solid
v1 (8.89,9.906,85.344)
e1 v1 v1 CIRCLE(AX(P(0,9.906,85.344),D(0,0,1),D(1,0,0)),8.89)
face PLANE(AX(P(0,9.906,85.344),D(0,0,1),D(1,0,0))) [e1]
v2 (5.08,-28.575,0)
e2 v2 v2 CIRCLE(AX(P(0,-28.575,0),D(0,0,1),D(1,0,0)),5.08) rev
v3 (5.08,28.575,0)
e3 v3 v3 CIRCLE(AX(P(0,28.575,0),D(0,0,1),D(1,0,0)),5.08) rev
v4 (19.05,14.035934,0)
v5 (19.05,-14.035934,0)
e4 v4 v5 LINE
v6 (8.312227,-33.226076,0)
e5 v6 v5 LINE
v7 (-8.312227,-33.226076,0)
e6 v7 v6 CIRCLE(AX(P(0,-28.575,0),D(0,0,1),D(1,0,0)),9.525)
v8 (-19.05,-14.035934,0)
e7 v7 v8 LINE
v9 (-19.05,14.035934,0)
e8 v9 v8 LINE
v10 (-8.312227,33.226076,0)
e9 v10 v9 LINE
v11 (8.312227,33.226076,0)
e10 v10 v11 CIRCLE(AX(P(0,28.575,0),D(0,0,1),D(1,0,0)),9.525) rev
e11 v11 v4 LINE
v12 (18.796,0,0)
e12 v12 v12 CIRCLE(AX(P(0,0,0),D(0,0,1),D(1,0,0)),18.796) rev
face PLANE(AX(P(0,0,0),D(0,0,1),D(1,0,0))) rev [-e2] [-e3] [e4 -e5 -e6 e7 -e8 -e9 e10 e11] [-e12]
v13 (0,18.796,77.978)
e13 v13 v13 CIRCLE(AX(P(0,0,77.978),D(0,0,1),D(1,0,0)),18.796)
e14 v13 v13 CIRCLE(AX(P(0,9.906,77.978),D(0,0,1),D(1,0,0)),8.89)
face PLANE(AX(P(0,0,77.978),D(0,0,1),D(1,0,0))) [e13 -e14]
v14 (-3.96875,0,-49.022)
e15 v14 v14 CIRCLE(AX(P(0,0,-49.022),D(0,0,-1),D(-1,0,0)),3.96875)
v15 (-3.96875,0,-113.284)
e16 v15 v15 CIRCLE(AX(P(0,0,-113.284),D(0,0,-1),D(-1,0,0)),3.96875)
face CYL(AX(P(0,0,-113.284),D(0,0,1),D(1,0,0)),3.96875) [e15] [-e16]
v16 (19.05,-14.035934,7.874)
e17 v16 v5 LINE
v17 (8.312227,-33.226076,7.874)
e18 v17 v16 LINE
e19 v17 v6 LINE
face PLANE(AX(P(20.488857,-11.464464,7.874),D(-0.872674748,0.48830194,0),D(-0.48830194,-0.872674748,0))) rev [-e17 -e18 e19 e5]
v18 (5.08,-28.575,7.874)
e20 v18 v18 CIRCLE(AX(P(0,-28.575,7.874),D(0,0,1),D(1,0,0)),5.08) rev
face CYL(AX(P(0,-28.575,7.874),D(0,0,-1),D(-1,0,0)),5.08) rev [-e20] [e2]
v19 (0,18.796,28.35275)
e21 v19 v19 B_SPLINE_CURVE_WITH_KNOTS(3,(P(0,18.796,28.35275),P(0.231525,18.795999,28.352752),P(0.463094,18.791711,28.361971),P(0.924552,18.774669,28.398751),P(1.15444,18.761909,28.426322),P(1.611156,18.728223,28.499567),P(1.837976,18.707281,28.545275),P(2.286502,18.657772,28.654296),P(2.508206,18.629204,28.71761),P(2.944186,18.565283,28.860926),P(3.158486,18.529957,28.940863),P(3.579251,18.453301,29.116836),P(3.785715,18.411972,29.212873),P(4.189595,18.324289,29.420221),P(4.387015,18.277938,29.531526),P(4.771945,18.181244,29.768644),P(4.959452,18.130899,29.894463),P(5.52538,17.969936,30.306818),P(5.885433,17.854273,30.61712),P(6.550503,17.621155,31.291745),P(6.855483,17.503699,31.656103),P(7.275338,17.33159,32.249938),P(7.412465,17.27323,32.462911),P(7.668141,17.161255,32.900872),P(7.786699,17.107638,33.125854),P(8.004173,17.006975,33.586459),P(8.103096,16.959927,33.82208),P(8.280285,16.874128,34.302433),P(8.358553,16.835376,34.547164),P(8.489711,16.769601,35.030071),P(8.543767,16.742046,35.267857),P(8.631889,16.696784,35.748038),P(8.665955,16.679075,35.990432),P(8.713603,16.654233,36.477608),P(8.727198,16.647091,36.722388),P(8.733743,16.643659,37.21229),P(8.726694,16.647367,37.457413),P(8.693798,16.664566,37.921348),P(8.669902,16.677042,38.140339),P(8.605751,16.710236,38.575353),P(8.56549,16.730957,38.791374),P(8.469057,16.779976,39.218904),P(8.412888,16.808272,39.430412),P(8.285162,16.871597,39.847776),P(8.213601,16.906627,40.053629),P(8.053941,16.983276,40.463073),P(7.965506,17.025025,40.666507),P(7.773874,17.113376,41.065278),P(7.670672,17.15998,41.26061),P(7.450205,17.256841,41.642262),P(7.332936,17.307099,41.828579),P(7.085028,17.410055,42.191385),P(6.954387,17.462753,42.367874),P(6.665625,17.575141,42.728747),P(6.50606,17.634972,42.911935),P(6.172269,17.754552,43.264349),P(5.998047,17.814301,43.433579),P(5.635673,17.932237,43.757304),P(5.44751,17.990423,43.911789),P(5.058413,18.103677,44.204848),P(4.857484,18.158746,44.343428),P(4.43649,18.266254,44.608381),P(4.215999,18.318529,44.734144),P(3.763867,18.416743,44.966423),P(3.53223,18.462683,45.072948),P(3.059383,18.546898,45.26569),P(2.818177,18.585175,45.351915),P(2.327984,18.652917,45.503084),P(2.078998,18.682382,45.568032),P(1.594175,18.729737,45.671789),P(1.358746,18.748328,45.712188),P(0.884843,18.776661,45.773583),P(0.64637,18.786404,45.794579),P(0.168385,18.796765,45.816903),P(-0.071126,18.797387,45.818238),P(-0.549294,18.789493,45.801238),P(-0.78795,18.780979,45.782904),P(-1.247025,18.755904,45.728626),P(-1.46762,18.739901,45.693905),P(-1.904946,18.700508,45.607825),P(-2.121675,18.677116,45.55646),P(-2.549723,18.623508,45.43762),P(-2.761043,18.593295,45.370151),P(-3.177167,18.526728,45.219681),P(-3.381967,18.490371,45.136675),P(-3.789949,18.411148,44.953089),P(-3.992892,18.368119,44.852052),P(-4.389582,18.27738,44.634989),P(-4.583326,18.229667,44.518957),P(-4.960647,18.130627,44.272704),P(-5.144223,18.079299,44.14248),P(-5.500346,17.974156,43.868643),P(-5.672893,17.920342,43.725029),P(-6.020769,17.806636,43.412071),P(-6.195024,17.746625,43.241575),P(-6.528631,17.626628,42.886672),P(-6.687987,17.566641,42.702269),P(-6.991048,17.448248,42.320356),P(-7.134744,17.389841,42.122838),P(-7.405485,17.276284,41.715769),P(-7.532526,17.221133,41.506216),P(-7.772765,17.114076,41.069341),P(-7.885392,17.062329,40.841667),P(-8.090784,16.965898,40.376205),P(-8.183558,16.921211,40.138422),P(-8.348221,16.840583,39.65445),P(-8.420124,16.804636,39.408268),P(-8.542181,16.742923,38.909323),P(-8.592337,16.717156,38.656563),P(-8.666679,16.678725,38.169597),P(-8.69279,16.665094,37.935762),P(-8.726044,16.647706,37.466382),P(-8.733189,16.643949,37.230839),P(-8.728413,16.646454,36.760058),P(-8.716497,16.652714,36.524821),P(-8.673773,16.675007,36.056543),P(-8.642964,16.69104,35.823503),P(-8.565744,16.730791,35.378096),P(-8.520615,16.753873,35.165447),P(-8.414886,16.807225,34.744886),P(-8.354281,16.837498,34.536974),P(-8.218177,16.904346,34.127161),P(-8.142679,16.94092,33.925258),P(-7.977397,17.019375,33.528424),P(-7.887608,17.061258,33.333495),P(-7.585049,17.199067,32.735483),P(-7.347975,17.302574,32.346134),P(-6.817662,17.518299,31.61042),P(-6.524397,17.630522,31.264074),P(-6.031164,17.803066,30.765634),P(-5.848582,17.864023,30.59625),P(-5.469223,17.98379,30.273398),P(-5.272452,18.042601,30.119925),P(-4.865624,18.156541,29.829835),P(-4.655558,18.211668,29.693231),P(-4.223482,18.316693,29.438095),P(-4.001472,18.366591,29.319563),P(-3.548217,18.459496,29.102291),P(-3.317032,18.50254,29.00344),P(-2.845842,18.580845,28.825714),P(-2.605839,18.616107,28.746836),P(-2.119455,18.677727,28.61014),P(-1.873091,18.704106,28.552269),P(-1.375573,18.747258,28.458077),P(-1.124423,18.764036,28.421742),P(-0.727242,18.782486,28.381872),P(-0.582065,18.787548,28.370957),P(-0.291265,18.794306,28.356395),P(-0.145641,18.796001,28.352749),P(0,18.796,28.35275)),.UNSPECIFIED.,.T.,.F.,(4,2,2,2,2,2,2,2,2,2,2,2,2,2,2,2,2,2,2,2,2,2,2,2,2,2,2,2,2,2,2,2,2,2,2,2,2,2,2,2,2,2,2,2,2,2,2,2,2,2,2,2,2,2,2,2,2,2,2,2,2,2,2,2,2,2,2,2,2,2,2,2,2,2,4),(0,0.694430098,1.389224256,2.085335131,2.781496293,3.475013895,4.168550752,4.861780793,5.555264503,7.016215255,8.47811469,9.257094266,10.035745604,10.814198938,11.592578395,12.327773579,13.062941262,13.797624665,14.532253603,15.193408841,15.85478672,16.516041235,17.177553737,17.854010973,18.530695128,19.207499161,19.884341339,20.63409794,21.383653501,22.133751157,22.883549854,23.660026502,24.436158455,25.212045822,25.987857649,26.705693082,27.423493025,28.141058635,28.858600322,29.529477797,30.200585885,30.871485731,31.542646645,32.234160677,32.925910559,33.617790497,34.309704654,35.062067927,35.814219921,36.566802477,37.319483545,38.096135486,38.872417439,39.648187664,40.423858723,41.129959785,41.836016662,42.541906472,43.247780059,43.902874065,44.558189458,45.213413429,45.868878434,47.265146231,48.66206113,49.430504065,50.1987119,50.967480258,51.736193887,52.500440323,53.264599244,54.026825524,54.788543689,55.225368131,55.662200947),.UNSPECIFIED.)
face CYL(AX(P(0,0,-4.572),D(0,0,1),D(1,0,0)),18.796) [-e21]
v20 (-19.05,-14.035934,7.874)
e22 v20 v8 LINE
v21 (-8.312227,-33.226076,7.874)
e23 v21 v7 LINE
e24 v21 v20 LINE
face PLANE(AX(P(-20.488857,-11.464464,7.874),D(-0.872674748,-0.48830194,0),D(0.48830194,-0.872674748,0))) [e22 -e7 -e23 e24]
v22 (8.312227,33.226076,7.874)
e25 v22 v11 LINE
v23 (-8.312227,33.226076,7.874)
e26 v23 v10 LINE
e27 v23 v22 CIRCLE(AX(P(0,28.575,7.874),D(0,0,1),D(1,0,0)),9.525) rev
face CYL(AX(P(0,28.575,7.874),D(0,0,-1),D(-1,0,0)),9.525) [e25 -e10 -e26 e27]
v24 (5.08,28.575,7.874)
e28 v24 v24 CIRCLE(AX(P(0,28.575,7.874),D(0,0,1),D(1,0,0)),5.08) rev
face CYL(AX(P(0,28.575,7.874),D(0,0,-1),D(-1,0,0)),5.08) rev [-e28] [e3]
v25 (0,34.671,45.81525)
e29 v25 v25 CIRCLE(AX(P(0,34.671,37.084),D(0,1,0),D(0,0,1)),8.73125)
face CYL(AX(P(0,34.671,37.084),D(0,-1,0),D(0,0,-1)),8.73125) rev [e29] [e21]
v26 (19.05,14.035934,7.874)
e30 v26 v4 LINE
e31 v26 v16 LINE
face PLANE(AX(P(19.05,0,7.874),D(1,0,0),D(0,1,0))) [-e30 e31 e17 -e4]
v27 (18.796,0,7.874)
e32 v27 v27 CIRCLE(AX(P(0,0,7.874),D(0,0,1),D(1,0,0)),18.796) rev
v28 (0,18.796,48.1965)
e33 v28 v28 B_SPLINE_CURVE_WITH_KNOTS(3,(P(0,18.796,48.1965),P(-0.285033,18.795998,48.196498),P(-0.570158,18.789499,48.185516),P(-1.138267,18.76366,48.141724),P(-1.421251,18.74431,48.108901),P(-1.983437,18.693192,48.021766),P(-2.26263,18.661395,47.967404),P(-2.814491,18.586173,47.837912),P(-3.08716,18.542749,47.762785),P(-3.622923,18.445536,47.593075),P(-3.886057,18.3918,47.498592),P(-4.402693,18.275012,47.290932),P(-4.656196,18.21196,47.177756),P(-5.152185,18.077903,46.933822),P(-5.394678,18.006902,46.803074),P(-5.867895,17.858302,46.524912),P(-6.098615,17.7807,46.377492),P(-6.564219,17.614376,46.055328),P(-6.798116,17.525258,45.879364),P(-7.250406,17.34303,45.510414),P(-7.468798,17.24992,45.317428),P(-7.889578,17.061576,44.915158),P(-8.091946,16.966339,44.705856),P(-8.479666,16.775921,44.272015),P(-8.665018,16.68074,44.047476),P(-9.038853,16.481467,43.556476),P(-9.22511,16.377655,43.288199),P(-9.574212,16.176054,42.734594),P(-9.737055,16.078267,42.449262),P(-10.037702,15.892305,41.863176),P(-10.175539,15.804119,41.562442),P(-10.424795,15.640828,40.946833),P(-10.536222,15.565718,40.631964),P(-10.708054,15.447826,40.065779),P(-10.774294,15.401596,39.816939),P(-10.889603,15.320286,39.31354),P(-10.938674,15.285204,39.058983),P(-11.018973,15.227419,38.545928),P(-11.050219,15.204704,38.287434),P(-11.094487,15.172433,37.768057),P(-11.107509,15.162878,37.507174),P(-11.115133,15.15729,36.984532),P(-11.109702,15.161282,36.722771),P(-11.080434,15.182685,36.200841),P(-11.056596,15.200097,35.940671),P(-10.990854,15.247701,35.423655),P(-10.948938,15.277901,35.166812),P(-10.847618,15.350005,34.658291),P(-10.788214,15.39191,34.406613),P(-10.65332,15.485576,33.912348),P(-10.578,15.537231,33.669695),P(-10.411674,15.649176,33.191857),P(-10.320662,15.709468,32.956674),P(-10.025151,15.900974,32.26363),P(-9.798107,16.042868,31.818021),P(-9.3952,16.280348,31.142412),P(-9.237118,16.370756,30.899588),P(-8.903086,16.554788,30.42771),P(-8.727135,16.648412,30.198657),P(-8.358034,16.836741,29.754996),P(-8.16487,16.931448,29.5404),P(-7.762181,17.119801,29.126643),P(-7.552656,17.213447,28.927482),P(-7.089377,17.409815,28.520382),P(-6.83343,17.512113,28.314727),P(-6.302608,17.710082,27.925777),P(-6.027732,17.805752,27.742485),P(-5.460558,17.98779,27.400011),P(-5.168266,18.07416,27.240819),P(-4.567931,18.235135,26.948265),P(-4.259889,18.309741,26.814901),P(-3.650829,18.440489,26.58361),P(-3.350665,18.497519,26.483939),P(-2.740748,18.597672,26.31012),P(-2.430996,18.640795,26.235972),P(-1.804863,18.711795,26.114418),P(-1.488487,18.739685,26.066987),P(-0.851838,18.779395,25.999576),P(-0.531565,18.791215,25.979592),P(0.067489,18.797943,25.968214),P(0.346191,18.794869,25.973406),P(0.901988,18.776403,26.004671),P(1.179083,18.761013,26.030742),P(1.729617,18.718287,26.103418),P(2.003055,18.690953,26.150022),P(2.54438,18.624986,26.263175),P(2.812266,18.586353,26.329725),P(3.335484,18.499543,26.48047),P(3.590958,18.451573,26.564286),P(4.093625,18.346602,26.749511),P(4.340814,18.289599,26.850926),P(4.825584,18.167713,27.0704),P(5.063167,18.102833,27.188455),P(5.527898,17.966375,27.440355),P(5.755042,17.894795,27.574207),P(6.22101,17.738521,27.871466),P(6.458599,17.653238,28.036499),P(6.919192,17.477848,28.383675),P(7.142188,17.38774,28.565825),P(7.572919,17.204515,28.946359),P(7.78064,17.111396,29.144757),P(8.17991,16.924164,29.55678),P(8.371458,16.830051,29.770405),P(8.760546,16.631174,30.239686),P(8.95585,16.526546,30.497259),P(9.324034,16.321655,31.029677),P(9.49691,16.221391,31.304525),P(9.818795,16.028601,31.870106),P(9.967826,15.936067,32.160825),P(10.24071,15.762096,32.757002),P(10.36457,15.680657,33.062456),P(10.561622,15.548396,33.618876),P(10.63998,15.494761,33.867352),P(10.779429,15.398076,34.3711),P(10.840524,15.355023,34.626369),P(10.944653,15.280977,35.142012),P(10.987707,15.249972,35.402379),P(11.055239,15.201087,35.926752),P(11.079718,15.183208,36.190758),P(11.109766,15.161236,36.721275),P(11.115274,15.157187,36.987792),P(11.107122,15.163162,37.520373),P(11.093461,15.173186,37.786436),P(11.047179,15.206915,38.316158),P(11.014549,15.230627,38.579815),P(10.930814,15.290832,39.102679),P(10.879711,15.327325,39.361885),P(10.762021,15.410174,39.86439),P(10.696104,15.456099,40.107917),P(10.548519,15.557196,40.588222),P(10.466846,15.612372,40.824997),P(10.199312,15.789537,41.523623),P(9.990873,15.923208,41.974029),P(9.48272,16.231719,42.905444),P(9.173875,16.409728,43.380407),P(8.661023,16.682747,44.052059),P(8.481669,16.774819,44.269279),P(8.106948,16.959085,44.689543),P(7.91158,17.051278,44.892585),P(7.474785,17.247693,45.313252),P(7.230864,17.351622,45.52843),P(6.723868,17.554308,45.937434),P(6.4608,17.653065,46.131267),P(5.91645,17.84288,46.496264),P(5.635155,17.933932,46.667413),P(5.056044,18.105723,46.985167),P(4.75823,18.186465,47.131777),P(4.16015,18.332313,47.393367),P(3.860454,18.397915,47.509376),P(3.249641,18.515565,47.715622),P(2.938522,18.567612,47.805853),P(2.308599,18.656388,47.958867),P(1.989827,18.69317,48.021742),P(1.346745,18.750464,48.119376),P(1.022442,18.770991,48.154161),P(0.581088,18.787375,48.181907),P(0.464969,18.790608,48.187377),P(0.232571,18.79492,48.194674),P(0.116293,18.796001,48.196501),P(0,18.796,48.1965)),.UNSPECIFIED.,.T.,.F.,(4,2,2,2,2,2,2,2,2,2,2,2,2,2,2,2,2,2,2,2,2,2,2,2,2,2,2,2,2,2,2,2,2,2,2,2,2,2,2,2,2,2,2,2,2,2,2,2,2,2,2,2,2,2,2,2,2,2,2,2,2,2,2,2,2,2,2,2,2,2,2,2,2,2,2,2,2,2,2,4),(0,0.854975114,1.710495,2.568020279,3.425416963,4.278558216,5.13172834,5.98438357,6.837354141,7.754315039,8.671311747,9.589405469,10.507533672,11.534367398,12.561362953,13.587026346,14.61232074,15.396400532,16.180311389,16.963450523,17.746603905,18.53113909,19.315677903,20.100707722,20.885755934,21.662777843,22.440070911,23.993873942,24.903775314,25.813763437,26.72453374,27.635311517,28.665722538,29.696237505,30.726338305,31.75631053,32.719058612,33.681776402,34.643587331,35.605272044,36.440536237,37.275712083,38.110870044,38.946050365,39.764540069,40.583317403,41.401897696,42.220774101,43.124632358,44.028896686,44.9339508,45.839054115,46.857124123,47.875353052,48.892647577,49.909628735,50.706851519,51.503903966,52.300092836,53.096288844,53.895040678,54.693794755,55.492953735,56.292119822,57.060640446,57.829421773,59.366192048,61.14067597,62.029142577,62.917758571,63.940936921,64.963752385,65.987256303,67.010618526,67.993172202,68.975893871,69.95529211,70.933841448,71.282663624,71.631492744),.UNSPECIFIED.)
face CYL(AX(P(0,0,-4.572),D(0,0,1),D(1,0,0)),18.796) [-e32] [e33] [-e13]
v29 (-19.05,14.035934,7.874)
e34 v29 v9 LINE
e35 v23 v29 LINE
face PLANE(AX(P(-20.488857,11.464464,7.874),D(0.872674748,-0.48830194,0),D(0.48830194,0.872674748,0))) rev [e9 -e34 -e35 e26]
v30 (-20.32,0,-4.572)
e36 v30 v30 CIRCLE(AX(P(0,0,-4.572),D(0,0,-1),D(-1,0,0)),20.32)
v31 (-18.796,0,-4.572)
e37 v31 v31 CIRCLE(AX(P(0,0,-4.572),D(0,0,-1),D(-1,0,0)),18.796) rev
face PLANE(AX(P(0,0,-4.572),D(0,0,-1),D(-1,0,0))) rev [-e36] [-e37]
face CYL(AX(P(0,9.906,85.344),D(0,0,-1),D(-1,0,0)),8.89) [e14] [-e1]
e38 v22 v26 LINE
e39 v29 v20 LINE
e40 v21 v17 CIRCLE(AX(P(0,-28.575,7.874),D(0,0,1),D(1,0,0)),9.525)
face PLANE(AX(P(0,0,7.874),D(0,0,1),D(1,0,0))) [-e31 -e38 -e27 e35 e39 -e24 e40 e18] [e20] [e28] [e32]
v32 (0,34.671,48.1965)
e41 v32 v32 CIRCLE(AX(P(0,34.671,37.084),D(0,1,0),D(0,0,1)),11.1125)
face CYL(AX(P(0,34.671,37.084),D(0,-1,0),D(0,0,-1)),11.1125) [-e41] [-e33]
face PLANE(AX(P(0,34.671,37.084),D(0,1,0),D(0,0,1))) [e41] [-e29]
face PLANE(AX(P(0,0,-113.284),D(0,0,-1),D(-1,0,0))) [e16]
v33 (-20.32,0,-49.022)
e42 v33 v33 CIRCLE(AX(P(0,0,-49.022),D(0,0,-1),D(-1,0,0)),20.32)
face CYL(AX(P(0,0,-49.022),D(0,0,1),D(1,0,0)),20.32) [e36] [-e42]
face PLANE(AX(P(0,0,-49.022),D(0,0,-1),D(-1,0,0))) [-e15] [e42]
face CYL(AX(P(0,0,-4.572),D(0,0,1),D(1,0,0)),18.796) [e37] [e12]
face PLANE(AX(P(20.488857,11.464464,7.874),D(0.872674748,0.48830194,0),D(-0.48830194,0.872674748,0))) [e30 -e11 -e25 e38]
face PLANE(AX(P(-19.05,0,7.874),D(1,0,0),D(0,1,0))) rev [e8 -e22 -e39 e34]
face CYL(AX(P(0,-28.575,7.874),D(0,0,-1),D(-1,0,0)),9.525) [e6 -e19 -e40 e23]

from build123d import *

# Parameters (mm, degrees)
MASTER_CYLINDER_BODY_DEPTH             = 77.978
MASTER_CYLINDER_BODY_DEPTH_BACK        = 4.572
SKETCH1_R                              = 18.796
MASTER_START                           = -7.874
MASTER_CYLINDER_MOUNTS_OUTLINE_R       = 5.08
MASTER_CYLINDER_MOUNTS_OUTLINE_R_2     = 18.796
MASTER_CYLINDER_MOUNTS_DEPTH           = 7.874
SKETCH3_R                              = 11.1125
SKETCH3_R_2                            = 8.73125
RESERVOIR_MOUNT_DEPTH                  = 15.875
RESERVOIR_MOUNT_DIRECTION_2_REACH      = 100.39
RESERVOIR_MOUNT_DIRECTION_2_END_RADIUS = 18.796
SKETCH5_R                              = 8.89
MASTER_CYLINDER_OUTLET_DEPTH           = 7.366
SKETCH6_R                              = 3.96875
PUSHROD_DEPTH                          = 108.712
SKETCH7_R                              = 20.32
RUBBER_COVER_DEPTH                     = 44.45


# Read off the part's stored shape, not the designer's step: Master Cylinder Mounts
with BuildPart() as part:
    # Sketch1 → Master Cylinder Body (new, two sides: drawn at the far end of the back side and taken through both)
    with BuildSketch(Plane.XY.offset(-MASTER_CYLINDER_BODY_DEPTH_BACK)):
        Circle(SKETCH1_R)
    extrude(amount=MASTER_CYLINDER_BODY_DEPTH + MASTER_CYLINDER_BODY_DEPTH_BACK)

    # Master Cylinder Mounts outline → Master Cylinder Mounts (add)
    with BuildSketch(Plane(origin=(0, 0, 0), x_dir=(-1, 0, 0), z_dir=(0, 0, -1)).offset(MASTER_START)):
        with BuildLine():
            ThreePointArc((-8.312226974, -33.226075976), (0, -38.1), (8.312226974, -33.226075976))
            Line((8.312226974, -33.226075976), (19.05, -14.035934373))
            Line((19.05, -14.035934373), (19.05, 14.035934373))
            Line((19.05, 14.035934373), (8.312226974, 33.226075976))
            ThreePointArc((8.312226974, 33.226075976), (0, 38.1), (-8.312226974, 33.226075976))
            Line((-8.312226974, 33.226075976), (-19.05, 14.035934373))
            Line((-19.05, 14.035934373), (-19.05, -14.035934373))
            Line((-19.05, -14.035934373), (-8.312226974, -33.226075976))
        make_face()
        with Locations((0, -28.575)):
            Circle(MASTER_CYLINDER_MOUNTS_OUTLINE_R, mode=Mode.SUBTRACT)
        Circle(MASTER_CYLINDER_MOUNTS_OUTLINE_R_2, mode=Mode.SUBTRACT)
        with Locations((0, 28.575)):
            Circle(MASTER_CYLINDER_MOUNTS_OUTLINE_R, mode=Mode.SUBTRACT)
    extrude(amount=MASTER_CYLINDER_MOUNTS_DEPTH)

    # Sketch3 → Reservoir Mount (add)
    with BuildSketch(Plane(origin=(0, 18.796, 0), x_dir=(1, 0, 0), z_dir=(0, 1, 0))):
        with Locations(Location((0, -37.084, 0), (0, 0, 270))):
            Circle(SKETCH3_R)
        with Locations(Location((0, -37.084, 0), (0, 0, 90))):
            Circle(SKETCH3_R_2, mode=Mode.SUBTRACT)
    extrude(amount=RESERVOIR_MOUNT_DEPTH)

    # Reservoir Mount direction 2: up to this cylinder (the profile starts outside it)
    reservoir_mount_direction_2_end = Plane(origin=(0, 0, 26.285809), z_dir=(0, 0, 1)) * Cylinder(RESERVOIR_MOUNT_DIRECTION_2_END_RADIUS, 239.372, mode=Mode.PRIVATE)
    # Sketch3 → Reservoir Mount direction 2 (add, up to the surface)
    with BuildSketch(Plane(origin=(0, 18.796, 0), x_dir=(1, 0, 0), z_dir=(0, 1, 0)), mode=Mode.PRIVATE) as reservoir_mount_direction_2_sk1:
        with Locations(Location((0, -37.084, 0), (0, 0, 270))):
            Circle(SKETCH3_R)
        with Locations(Location((0, -37.084, 0), (0, 0, 90))):
            Circle(SKETCH3_R_2, mode=Mode.SUBTRACT)
    reservoir_mount_direction_2_tool1 = extrude(reservoir_mount_direction_2_sk1.sketch, amount=-RESERVOIR_MOUNT_DIRECTION_2_REACH, mode=Mode.PRIVATE) - reservoir_mount_direction_2_end
    add(reservoir_mount_direction_2_tool1.solids().sort_by_distance((0, 18.796, 26.285809))[0])
    add(reservoir_mount_direction_2_tool1.solids().sort_by_distance((0, 18.796, 26.285809))[1])

    # Sketch5 → Master Cylinder Outlet (add)
    with BuildSketch(Plane.XY.offset(77.978)):
        with Locations(Location((0, 9.906, 0), (0, 0, 90))):
            Circle(SKETCH5_R)
    extrude(amount=MASTER_CYLINDER_OUTLET_DEPTH)

    # Sketch6 → Pushrod (add)
    with BuildSketch(Plane(origin=(0, 0, -4.572), x_dir=(-1, 0, 0), z_dir=(0, 0, -1))):
        with Locations(Location((0, 0, 0), (0, 0, 180))):
            Circle(SKETCH6_R)
    extrude(amount=PUSHROD_DEPTH)

    # Sketch7 → Rubber Cover (add)
    with BuildSketch(Plane(origin=(0, 0, -4.572), x_dir=(-1, 0, 0), z_dir=(0, 0, -1))):
        Circle(SKETCH7_R)
    extrude(amount=RUBBER_COVER_DEPTH)


solid = part.part
